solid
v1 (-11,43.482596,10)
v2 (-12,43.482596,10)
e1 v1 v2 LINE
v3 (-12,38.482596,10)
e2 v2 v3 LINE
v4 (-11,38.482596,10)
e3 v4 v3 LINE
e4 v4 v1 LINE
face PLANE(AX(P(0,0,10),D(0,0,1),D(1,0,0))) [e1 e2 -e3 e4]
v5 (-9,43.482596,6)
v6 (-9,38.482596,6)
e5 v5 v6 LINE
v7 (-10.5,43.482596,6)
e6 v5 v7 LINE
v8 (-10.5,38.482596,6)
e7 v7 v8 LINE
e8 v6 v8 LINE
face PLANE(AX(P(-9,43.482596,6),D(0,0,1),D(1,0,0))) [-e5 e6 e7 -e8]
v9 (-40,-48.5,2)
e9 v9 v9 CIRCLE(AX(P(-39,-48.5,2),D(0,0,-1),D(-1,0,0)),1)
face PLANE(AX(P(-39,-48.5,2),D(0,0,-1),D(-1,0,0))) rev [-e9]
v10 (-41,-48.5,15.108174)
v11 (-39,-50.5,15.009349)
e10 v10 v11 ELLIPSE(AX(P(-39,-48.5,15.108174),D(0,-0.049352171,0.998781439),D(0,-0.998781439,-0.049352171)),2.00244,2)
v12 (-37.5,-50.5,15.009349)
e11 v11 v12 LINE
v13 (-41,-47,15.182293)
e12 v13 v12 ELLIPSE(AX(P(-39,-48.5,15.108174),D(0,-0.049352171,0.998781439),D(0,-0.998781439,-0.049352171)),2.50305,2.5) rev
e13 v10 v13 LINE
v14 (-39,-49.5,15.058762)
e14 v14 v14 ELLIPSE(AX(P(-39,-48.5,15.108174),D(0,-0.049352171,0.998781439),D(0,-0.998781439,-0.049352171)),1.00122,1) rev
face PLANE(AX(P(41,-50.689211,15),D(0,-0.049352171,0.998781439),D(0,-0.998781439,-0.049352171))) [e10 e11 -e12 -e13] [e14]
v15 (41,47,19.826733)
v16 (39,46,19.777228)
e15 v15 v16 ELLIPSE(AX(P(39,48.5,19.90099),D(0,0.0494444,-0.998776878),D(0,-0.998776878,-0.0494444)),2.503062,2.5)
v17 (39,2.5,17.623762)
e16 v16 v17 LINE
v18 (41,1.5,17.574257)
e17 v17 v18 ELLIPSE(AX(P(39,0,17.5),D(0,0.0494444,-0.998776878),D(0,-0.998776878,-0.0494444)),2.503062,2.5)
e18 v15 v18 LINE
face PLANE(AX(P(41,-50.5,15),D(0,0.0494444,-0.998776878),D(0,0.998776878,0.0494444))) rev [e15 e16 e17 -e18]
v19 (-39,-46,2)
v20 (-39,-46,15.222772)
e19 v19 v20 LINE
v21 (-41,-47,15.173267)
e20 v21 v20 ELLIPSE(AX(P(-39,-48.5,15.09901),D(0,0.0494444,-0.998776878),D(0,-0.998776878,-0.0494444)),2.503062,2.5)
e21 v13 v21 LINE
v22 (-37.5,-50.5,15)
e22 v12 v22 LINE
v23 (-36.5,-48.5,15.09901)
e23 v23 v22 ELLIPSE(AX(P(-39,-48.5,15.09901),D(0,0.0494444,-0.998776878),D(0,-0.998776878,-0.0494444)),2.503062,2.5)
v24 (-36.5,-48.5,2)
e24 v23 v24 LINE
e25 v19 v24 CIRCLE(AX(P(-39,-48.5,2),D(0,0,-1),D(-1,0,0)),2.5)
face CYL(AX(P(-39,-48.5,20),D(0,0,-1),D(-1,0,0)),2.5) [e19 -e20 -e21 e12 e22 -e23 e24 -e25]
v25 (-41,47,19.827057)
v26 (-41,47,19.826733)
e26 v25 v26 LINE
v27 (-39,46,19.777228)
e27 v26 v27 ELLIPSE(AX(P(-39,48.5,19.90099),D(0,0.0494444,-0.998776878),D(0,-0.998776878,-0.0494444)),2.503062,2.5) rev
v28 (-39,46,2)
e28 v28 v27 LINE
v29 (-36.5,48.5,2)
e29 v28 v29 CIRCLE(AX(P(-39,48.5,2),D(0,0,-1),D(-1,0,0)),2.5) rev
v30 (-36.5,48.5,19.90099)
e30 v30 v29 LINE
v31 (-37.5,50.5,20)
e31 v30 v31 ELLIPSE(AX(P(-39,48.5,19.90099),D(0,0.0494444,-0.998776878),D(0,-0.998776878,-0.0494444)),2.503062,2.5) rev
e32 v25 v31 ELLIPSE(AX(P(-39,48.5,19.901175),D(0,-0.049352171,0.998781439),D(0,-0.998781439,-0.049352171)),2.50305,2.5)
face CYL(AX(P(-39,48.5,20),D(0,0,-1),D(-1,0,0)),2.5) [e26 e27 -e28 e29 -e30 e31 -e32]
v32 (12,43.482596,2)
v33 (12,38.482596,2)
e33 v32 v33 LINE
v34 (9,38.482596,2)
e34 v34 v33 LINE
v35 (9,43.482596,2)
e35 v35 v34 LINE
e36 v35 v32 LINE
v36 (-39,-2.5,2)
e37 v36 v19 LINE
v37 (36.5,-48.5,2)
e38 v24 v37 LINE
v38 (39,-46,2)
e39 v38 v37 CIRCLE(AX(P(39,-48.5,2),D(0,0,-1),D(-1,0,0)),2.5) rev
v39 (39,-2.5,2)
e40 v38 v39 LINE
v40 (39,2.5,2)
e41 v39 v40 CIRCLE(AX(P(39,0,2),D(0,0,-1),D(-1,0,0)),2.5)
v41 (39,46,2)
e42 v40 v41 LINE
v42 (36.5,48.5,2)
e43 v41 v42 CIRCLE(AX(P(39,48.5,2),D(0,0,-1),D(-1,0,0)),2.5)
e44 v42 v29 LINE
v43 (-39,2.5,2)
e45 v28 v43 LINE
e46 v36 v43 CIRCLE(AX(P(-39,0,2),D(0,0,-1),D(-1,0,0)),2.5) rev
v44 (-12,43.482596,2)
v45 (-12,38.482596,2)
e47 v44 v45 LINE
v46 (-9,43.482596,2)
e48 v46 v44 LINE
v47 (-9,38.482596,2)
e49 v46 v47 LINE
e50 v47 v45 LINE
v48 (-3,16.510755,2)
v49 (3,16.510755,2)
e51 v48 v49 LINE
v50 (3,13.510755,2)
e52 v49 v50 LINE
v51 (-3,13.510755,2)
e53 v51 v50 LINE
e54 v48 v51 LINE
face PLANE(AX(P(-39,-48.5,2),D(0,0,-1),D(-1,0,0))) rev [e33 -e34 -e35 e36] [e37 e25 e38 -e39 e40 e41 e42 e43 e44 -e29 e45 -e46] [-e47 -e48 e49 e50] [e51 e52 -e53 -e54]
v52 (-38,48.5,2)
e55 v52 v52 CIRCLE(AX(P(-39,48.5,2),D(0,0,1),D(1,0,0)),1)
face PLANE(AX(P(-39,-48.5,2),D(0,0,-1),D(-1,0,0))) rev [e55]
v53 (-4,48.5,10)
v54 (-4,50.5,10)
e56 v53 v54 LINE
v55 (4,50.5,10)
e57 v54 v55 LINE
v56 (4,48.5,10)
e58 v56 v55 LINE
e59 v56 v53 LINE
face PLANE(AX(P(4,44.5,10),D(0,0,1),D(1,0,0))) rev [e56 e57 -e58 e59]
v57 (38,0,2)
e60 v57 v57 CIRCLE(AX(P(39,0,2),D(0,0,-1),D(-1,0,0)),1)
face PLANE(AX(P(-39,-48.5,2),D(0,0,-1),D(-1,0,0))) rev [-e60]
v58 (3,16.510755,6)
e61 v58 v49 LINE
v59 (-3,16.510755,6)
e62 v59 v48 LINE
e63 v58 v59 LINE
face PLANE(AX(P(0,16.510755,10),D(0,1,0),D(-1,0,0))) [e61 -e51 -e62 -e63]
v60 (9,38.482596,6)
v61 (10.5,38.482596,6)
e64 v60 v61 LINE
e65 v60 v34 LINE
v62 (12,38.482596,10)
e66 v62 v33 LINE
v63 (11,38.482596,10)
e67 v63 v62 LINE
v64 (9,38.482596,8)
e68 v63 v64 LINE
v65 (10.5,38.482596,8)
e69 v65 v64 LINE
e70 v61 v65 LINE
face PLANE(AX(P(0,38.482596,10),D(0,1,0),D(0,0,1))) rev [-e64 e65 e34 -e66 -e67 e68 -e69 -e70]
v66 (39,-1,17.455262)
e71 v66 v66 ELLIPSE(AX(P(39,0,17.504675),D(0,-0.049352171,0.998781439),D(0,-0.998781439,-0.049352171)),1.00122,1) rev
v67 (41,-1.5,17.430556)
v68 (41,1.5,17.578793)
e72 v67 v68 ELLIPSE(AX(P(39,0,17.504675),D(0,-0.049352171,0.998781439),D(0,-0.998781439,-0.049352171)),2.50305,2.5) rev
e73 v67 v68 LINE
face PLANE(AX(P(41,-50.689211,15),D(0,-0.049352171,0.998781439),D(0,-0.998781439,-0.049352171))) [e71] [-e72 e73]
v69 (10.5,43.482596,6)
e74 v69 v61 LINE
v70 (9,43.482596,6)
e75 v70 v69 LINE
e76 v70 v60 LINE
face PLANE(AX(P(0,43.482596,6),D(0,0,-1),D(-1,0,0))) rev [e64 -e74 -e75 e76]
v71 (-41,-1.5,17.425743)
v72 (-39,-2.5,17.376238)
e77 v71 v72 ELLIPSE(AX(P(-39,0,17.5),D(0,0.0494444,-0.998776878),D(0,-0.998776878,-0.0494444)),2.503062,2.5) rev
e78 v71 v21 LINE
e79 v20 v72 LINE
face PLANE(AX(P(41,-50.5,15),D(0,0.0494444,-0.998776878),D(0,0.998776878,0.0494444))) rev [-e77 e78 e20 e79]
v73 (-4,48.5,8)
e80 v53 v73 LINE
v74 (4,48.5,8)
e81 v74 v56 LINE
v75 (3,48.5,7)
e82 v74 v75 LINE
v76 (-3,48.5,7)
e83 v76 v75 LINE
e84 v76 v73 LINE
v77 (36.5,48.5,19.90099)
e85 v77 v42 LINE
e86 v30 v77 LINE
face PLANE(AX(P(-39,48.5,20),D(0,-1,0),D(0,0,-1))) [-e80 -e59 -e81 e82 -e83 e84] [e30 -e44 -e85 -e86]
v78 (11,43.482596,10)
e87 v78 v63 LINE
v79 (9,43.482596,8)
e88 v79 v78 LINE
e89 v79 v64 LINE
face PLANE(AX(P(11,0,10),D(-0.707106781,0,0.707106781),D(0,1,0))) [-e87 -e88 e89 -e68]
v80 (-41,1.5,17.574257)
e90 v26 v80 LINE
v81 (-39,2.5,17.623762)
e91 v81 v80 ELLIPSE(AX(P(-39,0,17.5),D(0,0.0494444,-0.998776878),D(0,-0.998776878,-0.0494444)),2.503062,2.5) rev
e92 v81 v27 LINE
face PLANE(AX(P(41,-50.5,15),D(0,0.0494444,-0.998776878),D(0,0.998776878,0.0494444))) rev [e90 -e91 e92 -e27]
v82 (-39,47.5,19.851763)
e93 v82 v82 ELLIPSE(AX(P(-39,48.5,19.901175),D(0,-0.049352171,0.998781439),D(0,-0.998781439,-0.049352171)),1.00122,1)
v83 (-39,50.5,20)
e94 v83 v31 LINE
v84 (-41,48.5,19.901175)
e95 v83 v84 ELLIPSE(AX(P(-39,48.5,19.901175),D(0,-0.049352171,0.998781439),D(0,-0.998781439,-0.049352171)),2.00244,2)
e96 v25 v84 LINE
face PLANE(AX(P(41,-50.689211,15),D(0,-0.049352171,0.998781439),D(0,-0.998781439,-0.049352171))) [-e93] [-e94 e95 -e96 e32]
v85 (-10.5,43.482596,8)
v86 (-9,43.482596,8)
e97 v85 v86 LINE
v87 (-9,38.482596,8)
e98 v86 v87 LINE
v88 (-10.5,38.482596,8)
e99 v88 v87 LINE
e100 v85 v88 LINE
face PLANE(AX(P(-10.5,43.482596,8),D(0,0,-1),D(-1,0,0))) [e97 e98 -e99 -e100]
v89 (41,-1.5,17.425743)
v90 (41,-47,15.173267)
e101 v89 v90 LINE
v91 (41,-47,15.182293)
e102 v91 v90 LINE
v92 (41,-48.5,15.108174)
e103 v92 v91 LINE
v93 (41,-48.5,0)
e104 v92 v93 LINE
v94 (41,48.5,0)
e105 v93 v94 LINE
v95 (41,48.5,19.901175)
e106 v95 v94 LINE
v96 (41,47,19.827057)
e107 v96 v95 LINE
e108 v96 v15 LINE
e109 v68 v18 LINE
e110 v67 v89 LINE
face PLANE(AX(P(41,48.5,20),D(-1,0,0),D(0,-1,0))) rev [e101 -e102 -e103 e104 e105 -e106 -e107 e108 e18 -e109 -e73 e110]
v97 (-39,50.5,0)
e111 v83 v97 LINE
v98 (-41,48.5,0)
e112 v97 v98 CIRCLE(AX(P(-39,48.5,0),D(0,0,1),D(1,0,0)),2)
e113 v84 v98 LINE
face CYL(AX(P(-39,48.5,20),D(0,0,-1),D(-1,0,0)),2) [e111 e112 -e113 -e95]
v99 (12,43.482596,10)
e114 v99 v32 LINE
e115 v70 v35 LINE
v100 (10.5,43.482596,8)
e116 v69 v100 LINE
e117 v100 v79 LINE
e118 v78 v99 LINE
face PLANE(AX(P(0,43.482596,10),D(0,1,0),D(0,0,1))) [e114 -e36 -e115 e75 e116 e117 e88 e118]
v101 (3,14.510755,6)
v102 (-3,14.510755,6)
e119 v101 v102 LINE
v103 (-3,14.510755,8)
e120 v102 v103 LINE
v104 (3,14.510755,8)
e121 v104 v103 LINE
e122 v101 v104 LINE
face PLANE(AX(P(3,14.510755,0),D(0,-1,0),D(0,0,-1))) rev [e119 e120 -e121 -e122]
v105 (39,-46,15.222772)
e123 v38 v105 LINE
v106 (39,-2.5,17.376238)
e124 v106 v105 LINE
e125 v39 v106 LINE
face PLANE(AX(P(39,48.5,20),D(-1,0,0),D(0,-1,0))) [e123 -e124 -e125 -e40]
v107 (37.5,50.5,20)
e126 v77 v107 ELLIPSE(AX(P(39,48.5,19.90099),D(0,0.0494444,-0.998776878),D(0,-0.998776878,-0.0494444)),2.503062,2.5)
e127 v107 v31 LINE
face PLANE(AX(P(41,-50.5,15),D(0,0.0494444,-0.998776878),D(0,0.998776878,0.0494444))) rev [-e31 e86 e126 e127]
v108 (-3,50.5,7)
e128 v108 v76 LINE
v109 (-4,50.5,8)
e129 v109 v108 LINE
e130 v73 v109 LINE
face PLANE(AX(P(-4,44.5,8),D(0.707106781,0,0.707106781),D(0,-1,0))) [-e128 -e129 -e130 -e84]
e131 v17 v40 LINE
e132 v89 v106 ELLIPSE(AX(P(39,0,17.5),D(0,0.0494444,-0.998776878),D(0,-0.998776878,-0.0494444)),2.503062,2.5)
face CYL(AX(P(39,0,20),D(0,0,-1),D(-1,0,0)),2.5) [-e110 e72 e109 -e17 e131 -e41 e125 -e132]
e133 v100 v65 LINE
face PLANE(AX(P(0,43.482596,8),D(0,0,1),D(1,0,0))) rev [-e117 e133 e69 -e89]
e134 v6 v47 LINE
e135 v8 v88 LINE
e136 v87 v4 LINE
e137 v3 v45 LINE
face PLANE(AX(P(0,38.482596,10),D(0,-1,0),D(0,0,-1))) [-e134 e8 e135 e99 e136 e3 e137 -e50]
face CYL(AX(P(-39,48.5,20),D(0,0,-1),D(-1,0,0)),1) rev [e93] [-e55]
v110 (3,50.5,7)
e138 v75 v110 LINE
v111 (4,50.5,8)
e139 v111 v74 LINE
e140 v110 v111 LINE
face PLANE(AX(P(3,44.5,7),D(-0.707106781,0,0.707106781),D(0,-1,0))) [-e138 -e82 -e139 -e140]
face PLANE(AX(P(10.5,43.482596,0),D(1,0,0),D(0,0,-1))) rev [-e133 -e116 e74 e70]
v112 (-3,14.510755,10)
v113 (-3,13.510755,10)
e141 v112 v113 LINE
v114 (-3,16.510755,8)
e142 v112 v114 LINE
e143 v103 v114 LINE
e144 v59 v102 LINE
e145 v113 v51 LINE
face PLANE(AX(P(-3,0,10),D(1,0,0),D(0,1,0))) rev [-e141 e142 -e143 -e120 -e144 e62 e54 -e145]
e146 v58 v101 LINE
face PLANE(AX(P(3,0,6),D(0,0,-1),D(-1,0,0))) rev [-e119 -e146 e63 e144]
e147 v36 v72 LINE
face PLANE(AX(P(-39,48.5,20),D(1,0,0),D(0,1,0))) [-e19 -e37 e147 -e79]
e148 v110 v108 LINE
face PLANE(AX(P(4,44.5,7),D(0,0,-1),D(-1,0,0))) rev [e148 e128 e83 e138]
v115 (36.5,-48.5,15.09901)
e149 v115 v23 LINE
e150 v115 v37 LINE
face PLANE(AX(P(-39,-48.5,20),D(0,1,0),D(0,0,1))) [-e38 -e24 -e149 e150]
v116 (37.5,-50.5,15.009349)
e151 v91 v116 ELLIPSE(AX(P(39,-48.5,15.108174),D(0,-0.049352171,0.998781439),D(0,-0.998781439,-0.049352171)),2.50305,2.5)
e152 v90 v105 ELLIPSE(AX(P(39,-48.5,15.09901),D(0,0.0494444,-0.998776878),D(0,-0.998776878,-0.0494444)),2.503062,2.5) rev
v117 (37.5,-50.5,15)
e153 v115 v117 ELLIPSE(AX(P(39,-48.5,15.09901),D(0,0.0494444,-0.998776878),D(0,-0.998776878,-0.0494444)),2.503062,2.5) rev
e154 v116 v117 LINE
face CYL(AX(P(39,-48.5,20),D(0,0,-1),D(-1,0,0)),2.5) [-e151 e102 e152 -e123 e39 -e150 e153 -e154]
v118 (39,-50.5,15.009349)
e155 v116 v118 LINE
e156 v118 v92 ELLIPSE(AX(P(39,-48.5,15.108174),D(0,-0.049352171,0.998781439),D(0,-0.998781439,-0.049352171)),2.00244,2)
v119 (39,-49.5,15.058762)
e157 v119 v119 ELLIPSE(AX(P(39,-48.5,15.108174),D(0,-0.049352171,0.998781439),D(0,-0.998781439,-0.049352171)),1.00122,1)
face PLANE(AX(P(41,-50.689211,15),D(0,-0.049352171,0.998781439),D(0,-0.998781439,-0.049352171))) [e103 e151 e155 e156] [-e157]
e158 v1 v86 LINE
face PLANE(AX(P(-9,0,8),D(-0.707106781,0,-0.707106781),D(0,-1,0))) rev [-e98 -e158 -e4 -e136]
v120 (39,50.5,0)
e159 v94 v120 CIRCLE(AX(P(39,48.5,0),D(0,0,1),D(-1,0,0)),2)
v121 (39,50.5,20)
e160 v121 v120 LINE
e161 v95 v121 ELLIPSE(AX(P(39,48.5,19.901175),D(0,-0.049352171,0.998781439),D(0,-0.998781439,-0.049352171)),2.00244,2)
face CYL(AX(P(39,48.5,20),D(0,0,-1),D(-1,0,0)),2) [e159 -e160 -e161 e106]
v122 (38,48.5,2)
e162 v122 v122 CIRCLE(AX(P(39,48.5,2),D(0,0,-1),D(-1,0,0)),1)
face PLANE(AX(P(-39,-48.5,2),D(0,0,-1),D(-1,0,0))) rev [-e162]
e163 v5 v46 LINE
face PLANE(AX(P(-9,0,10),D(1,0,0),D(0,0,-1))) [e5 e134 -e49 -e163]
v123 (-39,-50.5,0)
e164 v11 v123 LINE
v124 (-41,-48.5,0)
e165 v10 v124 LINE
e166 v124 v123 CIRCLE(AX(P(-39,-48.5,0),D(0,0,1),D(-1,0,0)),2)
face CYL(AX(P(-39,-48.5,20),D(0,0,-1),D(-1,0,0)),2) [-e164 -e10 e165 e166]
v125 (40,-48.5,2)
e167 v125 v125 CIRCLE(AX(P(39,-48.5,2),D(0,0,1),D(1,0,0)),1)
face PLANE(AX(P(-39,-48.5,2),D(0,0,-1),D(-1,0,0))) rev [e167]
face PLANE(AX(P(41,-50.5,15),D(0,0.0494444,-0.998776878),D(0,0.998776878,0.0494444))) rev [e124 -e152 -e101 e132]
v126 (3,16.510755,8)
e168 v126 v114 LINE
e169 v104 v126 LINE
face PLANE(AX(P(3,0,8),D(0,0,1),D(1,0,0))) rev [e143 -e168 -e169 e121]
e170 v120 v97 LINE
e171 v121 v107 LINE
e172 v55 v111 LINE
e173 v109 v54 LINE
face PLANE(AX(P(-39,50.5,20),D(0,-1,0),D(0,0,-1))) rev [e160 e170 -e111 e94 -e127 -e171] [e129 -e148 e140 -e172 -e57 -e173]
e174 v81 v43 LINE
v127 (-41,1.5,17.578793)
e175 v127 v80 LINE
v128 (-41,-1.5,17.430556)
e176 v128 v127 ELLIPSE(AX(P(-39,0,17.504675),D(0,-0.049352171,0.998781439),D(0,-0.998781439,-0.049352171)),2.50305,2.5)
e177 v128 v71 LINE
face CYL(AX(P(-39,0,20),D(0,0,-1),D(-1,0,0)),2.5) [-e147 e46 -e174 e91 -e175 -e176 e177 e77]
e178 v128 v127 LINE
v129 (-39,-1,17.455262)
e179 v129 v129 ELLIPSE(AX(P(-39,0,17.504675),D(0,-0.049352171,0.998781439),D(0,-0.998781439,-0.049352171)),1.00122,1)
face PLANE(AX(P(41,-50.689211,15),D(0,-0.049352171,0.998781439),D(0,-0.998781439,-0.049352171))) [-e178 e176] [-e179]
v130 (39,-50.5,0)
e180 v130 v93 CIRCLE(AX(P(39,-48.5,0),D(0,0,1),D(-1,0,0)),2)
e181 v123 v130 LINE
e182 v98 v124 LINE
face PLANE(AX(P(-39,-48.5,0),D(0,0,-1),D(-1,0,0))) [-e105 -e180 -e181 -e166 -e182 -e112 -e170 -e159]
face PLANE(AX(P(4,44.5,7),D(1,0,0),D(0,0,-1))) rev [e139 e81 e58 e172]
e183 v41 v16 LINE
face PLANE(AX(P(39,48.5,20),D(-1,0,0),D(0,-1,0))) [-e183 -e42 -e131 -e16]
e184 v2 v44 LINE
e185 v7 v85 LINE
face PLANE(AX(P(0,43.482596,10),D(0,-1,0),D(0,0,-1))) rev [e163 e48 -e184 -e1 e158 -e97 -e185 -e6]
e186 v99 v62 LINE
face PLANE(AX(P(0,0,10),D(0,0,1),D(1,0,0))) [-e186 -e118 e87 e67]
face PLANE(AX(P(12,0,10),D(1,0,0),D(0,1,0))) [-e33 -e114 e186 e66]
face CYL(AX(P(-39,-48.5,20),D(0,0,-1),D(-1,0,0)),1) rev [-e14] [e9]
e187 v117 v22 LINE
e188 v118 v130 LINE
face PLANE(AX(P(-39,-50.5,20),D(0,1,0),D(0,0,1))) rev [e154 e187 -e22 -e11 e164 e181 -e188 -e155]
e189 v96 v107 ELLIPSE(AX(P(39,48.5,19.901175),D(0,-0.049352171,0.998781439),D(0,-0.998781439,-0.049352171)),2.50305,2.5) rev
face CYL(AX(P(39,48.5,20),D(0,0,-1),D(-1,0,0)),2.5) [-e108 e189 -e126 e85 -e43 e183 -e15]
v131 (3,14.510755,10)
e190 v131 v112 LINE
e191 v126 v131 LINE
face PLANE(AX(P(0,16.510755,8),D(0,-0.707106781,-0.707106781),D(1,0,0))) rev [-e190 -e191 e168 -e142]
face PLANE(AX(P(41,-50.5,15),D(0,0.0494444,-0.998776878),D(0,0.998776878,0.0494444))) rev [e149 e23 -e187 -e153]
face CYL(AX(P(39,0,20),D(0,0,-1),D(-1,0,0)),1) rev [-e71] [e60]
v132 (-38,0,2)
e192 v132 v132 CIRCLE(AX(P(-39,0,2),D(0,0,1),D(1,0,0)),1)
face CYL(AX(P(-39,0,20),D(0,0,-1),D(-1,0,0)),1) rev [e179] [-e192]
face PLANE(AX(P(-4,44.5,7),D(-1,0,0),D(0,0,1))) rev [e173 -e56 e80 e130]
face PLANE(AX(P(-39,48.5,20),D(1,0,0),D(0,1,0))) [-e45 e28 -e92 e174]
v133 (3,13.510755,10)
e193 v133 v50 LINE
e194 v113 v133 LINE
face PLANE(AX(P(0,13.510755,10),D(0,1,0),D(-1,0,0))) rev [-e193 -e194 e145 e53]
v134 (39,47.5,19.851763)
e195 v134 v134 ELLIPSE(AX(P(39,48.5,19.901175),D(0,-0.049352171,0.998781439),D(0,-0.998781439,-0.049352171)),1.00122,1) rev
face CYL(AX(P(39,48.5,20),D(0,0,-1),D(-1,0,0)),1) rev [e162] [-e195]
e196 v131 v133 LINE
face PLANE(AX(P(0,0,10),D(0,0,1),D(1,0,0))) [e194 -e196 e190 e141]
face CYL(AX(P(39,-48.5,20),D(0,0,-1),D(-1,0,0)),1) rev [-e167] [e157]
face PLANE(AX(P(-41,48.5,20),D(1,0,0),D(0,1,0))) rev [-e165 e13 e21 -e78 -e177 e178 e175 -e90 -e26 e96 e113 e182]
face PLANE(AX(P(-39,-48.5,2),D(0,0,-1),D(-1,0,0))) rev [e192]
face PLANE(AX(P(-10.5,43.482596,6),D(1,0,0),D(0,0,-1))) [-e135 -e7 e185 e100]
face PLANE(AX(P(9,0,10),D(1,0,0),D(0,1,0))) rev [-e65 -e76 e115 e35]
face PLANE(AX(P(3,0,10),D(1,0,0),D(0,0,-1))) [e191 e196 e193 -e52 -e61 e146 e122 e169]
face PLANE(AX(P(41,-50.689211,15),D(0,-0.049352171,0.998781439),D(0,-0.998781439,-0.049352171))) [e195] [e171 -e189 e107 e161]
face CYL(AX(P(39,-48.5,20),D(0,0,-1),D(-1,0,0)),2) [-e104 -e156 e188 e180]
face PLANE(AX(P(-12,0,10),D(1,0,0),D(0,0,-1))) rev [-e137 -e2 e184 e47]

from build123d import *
from build123d.topology import SkipClean

# Parameters (mm, degrees)
BOSS_EXTRU_1_DEPTH      = 20
COQUE1_START            = -48.5
COQUE1_OUTLINE_W        = 78
COQUE1_OUTLINE_H        = 18
COQUE1_DEPTH            = 97
ENL_V_MAT_EXTRU_1_DEPTH = 99.357765326
ESQUISSE3_W             = 3
ESQUISSE3_H             = 5
ESQUISSE3_W_2           = 6
ESQUISSE3_H_2           = 3
BOSS_EXTRU_2_DEPTH      = 8
ESQUISSE4_W             = 1.5
ESQUISSE4_H             = 2
ENL_V_MAT_EXTRU_2_DEPTH = 5
CHANFREIN1_SIZE         = 2
ESQUISSE5_W             = 2
ESQUISSE5_H             = 2
ENL_V_MAT_EXTRU_3_DEPTH = 6
CHANFREIN2_SIZE         = 2
ESQUISSE7_W             = 8
ESQUISSE7_H             = 3
ENL_V_MAT_EXTRU_4_DEPTH = 6
CHANFREIN3_SIZE         = 1
ESQUISSE9_R             = 1
ENL_V_MAT_EXTRU_5_DEPTH = 68.492592186
ESQUISSE10_R            = 1
BOSS_EXTRU_5_DEPTH      = 20
ENL_V_MAT_EXTRU_6_DEPTH = 82


# Read off the part's stored shape, not the designer's step: Coque1
with BuildPart() as part:
    # Esquisse1 → Boss.-Extru.1 (new body)
    with BuildSketch(Plane.XY):
        with BuildLine():
            Line((-39, 50.5), (39, 50.5))
            ThreePointArc((39, 50.5), (40.414213562, 49.914213562), (41, 48.5))
            Line((41, 48.5), (41, -48.5))
            ThreePointArc((41, -48.5), (40.414213562, -49.914213562), (39, -50.5))
            Line((39, -50.5), (-39, -50.5))
            ThreePointArc((-39, -50.5), (-40.414213562, -49.914213562), (-41, -48.5))
            Line((-41, -48.5), (-41, 48.5))
            ThreePointArc((-41, 48.5), (-40.414213562, 49.914213562), (-39, 50.5))
        make_face()
    extrude(amount=BOSS_EXTRU_1_DEPTH)

    # Coque1 outline → Coque1 (cut)
    with BuildSketch(Plane(origin=(0, 0, 0), x_dir=(1, 0, 0), z_dir=(0, 1, 0)).offset(COQUE1_START)):
        with Locations((0, -11)):
            Rectangle(COQUE1_OUTLINE_W, COQUE1_OUTLINE_H)
    extrude(amount=COQUE1_DEPTH, mode=Mode.SUBTRACT)

    # Esquisse2 → Enlèv. mat.-Extru.1 (cut, through all)
    with BuildSketch(Plane.ZY.offset(41)):
        Polygon((20, -50.5), (15, -50.5), (20, 50.5), align=None)
    extrude(amount=-ENL_V_MAT_EXTRU_1_DEPTH, mode=Mode.SUBTRACT)

    # Esquisse3 → Boss.-Extru.2 (add)
    with BuildSketch(Plane.XY.offset(2)):
        with Locations((10.5, 40.982596477)):
            Rectangle(ESQUISSE3_W, ESQUISSE3_H)
        with Locations((-10.5, 40.982596477)):
            Rectangle(ESQUISSE3_W, ESQUISSE3_H)
        with Locations((0, 15.010755302)):
            Rectangle(ESQUISSE3_W_2, ESQUISSE3_H_2)
    extrude(amount=BOSS_EXTRU_2_DEPTH)

    # Esquisse4 → Enlèv. mat.-Extru.2 (cut)
    with BuildSketch(Plane.XZ.offset(-38.482596477)):
        with Locations((9.75, 7)):
            Rectangle(ESQUISSE4_W, ESQUISSE4_H)
        with Locations((-9.75, 7)):
            Rectangle(ESQUISSE4_W, ESQUISSE4_H)
    extrude(amount=-ENL_V_MAT_EXTRU_2_DEPTH, mode=Mode.SUBTRACT)

    # Chanfrein1
    chanfrein1_edges = [part.edges().sort_by_distance(p)[0] for p in [
        (9, 40.982596477, 10),
        (-9, 40.982596477, 10),
    ]]
    chamfer(chanfrein1_edges, length=CHANFREIN1_SIZE - 0.0001)  # a hair under: the kernel refuses the full size

    # Esquisse5 → Enlèv. mat.-Extru.3 (cut)
    with BuildSketch(Plane.ZY.offset(3)):
        with Locations((7, 15.510755302)):
            Rectangle(ESQUISSE5_W, ESQUISSE5_H)
    extrude(amount=-ENL_V_MAT_EXTRU_3_DEPTH, mode=Mode.SUBTRACT)

    # Chanfrein2
    chanfrein2_edges = [part.edges().sort_by_distance(p)[0] for p in [
        (0, 16.510755302, 10),
    ]]
    chamfer(chanfrein2_edges, length=CHANFREIN2_SIZE - 0.0001)  # a hair under: the kernel refuses the full size

    # Esquisse7 → Enlèv. mat.-Extru.4 (cut)
    with BuildSketch(Plane(origin=(0, 50.5, 0), x_dir=(1, 0, 0), z_dir=(0, 1, 0))):
        with Locations((0, -8.5)):
            Rectangle(ESQUISSE7_W, ESQUISSE7_H)
    extrude(amount=-ENL_V_MAT_EXTRU_4_DEPTH, mode=Mode.SUBTRACT)

    # Chanfrein3
    chanfrein3_edges = [part.edges().sort_by_distance(p)[0] for p in [
        (4, 49.5, 7),
        (-4, 49.5, 7),
    ]]
    chamfer(chanfrein3_edges, length=CHANFREIN3_SIZE)

    # Esquisse9 → Enlèv. mat.-Extru.5 (cut, through all)
    with BuildSketch(Plane.XY.offset(2)):
        with Locations((-39, 48.5)):
            Circle(ESQUISSE9_R)
        with Locations((-39, -48.5)):
            Circle(ESQUISSE9_R)
        with Locations((-39, 0)):
            Circle(ESQUISSE9_R)
        with Locations((39, 0)):
            Circle(ESQUISSE9_R)
        with Locations((39, -48.5)):
            Circle(ESQUISSE9_R)
        with Locations((39, 48.5)):
            Circle(ESQUISSE9_R)
    extrude(amount=ENL_V_MAT_EXTRU_5_DEPTH, mode=Mode.SUBTRACT)

    # Esquisse10 → Boss.-Extru.5 (add)
    # profile 1 of 12: a face of its own
    with SkipClean():  # the faces are left unmerged after this step: merging them gives an invalid solid
        with BuildSketch(Plane.XY):
            with BuildLine():
                Line((-41, 48.5), (-41, 47))
                ThreePointArc((-41, 47), (-38.209430585, 46.128291755), (-36.5, 48.5))
                ThreePointArc((-36.5, 48.5), (-36.763932023, 49.618033989), (-37.5, 50.5))
                Line((-37.5, 50.5), (-39, 50.5))
                ThreePointArc((-39, 50.5), (-40.414213562, 49.914213562), (-41, 48.5))
            make_face()
            with Locations((-39, 48.5)):
                Circle(ESQUISSE10_R, mode=Mode.SUBTRACT)
        # profile 2 of 12: a face of its own
        with BuildSketch(Plane.XY):
            with BuildLine():
                Line((39, 50.5), (37.5, 50.5))
                ThreePointArc((37.5, 50.5), (37.232233047, 46.732233047), (41, 47))
                Line((41, 47), (41, 48.5))
                ThreePointArc((41, 48.5), (40.414213562, 49.914213562), (39, 50.5))
            make_face()
            with Locations(Location((39, 48.5, 0), (0, 0, 180))):
                Circle(ESQUISSE10_R, mode=Mode.SUBTRACT)
        # profile 3 of 12: a face of its own
        with BuildSketch(Plane.XY):
            with BuildLine():
                ThreePointArc((-40, 0), (-39, 1), (-38, 0))
                Line((-38, 0), (-36.5, 0))
                ThreePointArc((-36.5, 0), (-38.209430585, 2.371708245), (-41, 1.5))
                Line((-41, 1.5), (-41, 0))
                Line((-41, 0), (-40, 0))
            make_face()
        # profile 4 of 12: a face of its own
        with BuildSketch(Plane.XY):
            with BuildLine():
                Line((-36.5, 0), (-38, 0))
                ThreePointArc((-38, 0), (-39, -1), (-40, 0))
                Line((-40, 0), (-41, 0))
                Line((-41, 0), (-41, -1.5))
                ThreePointArc((-41, -1.5), (-38.209430585, -2.371708245), (-36.5, 0))
            make_face()
        # profile 5 of 12: a face of its own
        with BuildSketch(Plane.XY):
            with BuildLine():
                ThreePointArc((-40, 0), (-39, 1), (-38, 0))
                Line((-38, 0), (-36.5, 0))
                ThreePointArc((-36.5, 0), (-38.209430585, 2.371708245), (-41, 1.5))
                Line((-41, 1.5), (-41, 0))
                Line((-41, 0), (-40, 0))
            make_face()
        # profile 6 of 12: a face of its own
        with BuildSketch(Plane.XY):
            with BuildLine():
                Line((-36.5, 0), (-38, 0))
                ThreePointArc((-38, 0), (-39, -1), (-40, 0))
                Line((-40, 0), (-41, 0))
                Line((-41, 0), (-41, -1.5))
                ThreePointArc((-41, -1.5), (-38.209430585, -2.371708245), (-36.5, 0))
            make_face()
        # profile 7 of 12: a face of its own
        with BuildSketch(Plane.XY):
            with BuildLine():
                ThreePointArc((-36.5, -48.5), (-38.209430585, -46.128291755), (-41, -47))
                Line((-41, -47), (-41, -48.5))
                ThreePointArc((-41, -48.5), (-40.414213562, -49.914213562), (-39, -50.5))
                Line((-39, -50.5), (-37.5, -50.5))
                ThreePointArc((-37.5, -50.5), (-36.763932023, -49.618033989), (-36.5, -48.5))
            make_face()
            with Locations(Location((-39, -48.5, 0), (0, 0, 180))):
                Circle(ESQUISSE10_R, mode=Mode.SUBTRACT)
        # profile 8 of 12: a face of its own
        with BuildSketch(Plane.XY):
            with BuildLine():
                ThreePointArc((41, -47), (37.232233047, -46.732233047), (37.5, -50.5))
                Line((37.5, -50.5), (39, -50.5))
                ThreePointArc((39, -50.5), (40.414213562, -49.914213562), (41, -48.5))
                Line((41, -48.5), (41, -47))
            make_face()
            with Locations((39, -48.5)):
                Circle(ESQUISSE10_R, mode=Mode.SUBTRACT)
        # profile 9 of 12: a face of its own
        with BuildSketch(Plane.XY):
            with BuildLine():
                ThreePointArc((41, 1.5), (38.209430585, 2.371708245), (36.5, 0))
                Line((36.5, 0), (38, 0))
                ThreePointArc((38, 0), (39, 1), (40, 0))
                Line((40, 0), (41, 0))
                Line((41, 0), (41, 1.5))
            make_face()
        # profile 10 of 12: a face of its own
        with BuildSketch(Plane.XY):
            with BuildLine():
                Line((38, 0), (36.5, 0))
                ThreePointArc((36.5, 0), (38.209430585, -2.371708245), (41, -1.5))
                Line((41, -1.5), (41, 0))
                Line((41, 0), (40, 0))
                ThreePointArc((40, 0), (39, -1), (38, 0))
            make_face()
        # profile 11 of 12: a face of its own
        with BuildSketch(Plane.XY):
            with BuildLine():
                ThreePointArc((41, 1.5), (38.209430585, 2.371708245), (36.5, 0))
                Line((36.5, 0), (38, 0))
                ThreePointArc((38, 0), (39, 1), (40, 0))
                Line((40, 0), (41, 0))
                Line((41, 0), (41, 1.5))
            make_face()
        # profile 12 of 12: a face of its own
        with BuildSketch(Plane.XY):
            with BuildLine():
                Line((38, 0), (36.5, 0))
                ThreePointArc((36.5, 0), (38.209430585, -2.371708245), (41, -1.5))
                Line((41, -1.5), (41, 0))
                Line((41, 0), (40, 0))
                ThreePointArc((40, 0), (39, -1), (38, 0))
            make_face()
        extrude(amount=BOSS_EXTRU_5_DEPTH)
    add(part.part.scale(1), mode=Mode.REPLACE)  # the faces are merged on a copy

    # Esquisse11 → Enlèv. mat.-Extru.6 (cut)
    with BuildSketch(Plane(origin=(-41, 0, -41), x_dir=(0, 0, 1), z_dir=(-1, 0, 0))):
        Polygon((61, -50.68921089), (56, -50.68921089), (61, 50.5), align=None)
    extrude(amount=-ENL_V_MAT_EXTRU_6_DEPTH, mode=Mode.SUBTRACT)


solid = part.part
